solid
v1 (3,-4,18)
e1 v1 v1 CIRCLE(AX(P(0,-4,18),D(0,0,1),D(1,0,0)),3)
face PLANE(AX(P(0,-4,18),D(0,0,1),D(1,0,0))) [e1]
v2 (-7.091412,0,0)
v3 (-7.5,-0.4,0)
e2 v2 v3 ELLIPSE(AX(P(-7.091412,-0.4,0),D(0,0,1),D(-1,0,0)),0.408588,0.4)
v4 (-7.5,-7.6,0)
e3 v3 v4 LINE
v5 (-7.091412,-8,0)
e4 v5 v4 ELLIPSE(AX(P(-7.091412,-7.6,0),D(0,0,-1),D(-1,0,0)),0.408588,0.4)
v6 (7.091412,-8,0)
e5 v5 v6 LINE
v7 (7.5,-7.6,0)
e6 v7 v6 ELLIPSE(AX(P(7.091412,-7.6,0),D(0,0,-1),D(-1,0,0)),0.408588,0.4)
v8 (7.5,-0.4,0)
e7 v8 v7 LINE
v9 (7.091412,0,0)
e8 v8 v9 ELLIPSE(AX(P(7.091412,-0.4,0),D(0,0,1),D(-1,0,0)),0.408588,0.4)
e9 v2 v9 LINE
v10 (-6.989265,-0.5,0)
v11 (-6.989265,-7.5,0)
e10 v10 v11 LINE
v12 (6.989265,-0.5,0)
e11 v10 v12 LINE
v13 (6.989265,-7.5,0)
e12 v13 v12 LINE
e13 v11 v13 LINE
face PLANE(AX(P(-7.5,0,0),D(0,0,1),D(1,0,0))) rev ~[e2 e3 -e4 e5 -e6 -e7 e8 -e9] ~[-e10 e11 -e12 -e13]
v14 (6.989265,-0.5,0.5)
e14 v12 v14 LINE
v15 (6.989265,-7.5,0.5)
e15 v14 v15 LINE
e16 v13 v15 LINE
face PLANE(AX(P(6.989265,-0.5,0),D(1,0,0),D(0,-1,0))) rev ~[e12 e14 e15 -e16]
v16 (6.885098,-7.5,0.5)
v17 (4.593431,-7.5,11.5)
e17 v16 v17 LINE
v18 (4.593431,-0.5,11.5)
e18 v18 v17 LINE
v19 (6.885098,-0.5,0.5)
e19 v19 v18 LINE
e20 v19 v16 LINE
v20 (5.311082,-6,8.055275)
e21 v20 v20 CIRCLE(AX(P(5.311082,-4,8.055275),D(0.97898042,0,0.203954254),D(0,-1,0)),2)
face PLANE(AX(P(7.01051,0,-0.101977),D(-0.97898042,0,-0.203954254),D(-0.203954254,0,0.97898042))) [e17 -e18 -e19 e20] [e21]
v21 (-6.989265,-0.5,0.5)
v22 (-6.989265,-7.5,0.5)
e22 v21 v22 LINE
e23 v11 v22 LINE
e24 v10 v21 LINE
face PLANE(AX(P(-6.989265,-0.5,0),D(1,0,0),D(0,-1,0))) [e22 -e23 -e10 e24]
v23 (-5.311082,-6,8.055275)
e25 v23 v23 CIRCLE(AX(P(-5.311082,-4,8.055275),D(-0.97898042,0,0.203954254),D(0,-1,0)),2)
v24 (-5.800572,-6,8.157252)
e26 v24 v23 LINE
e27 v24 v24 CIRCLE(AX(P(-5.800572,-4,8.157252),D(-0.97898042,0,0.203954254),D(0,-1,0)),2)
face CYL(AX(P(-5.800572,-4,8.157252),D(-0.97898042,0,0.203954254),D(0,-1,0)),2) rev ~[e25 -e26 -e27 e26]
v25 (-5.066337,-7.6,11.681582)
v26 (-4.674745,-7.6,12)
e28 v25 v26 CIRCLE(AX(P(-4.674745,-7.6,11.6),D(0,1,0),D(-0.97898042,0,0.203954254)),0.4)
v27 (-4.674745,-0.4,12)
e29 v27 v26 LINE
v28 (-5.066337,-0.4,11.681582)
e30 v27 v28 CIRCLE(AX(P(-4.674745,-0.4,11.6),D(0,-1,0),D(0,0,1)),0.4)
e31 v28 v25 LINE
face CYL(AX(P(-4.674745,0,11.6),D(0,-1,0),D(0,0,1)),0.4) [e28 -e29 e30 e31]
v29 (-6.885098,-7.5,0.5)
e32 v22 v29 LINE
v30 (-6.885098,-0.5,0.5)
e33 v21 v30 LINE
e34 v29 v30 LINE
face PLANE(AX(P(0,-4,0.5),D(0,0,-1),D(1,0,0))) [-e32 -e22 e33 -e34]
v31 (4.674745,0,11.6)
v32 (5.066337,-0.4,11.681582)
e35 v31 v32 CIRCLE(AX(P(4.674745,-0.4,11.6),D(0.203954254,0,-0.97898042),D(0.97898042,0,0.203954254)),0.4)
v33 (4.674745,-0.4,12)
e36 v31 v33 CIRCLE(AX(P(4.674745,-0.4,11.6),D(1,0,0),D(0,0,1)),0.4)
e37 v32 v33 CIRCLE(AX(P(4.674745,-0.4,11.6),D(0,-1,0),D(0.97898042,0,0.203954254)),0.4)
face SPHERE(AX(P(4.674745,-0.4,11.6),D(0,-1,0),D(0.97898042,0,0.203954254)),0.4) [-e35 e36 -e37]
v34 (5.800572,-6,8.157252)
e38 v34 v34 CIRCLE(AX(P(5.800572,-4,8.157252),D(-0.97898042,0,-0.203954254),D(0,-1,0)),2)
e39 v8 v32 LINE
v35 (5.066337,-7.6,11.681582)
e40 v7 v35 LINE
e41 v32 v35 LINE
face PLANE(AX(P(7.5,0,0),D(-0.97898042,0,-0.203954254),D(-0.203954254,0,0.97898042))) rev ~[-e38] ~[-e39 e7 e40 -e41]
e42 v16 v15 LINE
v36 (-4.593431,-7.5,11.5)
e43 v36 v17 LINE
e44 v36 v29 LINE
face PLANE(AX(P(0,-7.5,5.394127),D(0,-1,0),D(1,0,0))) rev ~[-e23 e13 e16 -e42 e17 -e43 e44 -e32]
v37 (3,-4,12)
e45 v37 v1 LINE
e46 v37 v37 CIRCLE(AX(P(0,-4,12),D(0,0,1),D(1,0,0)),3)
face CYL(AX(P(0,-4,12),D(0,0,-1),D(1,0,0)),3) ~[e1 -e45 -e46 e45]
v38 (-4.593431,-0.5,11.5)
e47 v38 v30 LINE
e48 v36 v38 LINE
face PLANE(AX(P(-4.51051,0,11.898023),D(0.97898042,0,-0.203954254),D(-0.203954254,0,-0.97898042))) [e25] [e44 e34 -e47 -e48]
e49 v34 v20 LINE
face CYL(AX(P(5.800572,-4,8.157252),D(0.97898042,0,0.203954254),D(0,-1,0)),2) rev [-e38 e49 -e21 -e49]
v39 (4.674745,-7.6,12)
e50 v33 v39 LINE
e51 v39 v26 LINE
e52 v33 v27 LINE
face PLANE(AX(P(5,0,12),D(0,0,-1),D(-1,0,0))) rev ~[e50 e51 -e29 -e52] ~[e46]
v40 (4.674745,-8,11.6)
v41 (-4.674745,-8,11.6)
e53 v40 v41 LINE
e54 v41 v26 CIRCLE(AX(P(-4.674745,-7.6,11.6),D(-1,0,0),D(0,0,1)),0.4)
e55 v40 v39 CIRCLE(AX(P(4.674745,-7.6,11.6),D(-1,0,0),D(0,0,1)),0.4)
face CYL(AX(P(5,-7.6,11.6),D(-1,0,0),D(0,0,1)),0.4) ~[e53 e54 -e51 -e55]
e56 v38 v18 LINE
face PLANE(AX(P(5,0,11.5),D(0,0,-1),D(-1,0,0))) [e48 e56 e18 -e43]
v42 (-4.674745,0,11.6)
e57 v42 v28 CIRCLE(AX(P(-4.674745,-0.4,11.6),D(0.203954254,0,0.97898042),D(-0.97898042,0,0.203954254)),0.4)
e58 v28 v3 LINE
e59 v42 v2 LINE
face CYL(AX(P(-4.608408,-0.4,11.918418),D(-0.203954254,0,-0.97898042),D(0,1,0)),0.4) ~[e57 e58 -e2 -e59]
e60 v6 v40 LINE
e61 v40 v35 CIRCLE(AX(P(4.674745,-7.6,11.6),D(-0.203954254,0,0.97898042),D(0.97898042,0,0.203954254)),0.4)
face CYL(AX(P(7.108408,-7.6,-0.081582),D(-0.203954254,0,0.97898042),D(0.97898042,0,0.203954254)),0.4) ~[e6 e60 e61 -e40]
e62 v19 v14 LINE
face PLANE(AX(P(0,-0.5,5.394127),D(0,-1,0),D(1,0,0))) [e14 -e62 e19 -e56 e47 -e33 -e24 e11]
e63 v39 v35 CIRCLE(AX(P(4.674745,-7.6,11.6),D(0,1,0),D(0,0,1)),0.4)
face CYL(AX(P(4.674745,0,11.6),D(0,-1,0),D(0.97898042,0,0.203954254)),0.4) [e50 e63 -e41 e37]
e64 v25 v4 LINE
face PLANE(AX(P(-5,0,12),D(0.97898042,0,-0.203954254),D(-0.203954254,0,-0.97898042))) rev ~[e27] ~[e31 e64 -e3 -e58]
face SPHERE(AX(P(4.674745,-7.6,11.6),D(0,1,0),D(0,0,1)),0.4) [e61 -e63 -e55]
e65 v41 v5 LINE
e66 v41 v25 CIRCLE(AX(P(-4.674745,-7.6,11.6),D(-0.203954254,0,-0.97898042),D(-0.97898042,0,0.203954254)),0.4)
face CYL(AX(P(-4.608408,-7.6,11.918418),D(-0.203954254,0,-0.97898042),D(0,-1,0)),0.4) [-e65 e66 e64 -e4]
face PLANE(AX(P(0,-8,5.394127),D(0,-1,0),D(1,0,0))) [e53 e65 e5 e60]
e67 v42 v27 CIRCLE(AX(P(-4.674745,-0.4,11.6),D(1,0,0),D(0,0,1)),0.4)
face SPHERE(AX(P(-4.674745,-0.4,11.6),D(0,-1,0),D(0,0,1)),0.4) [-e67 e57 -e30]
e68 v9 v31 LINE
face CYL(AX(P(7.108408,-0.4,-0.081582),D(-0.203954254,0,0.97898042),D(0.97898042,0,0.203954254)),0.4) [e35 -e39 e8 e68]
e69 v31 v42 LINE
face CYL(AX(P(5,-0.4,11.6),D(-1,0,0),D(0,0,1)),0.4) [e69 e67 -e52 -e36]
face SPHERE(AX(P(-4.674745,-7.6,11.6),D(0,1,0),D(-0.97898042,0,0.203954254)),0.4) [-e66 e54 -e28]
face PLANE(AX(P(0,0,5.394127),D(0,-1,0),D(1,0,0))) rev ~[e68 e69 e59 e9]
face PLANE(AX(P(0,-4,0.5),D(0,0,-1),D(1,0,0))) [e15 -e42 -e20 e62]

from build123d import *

# Parameters (mm, degrees)
F1_DEPTH = 8
F2_T     = -0.5
F3_W     = 13.9785291107
F3_H     = 7
F4_DEPTH = 0.5
F5_R     = 0.4
F6_R     = 2
F7_DEPTH = 1
F8_R     = 3
F9_DEPTH = 6


# Not quite as in the source:
# - a pattern or mirror of a feature is missing from the dataset's text; its kind, count and spacing are read off the source's solid


with BuildPart() as f1:
    # F0 (on Front) → F1 (new body)
    with BuildSketch(Plane.XZ):
        Polygon((-7.5, 0), (0, 0), (7.5, 0), (5, 12), (0, 12), (-5, 12), align=None)
    extrude(amount=F1_DEPTH)

    # F2
    f2_openings = [f1.faces().sort_by_distance(p)[0] for p in [
        (0, -4, 0),
    ]]
    offset(amount=F2_T, openings=f2_openings)

    # F3 (on face) → F4 (cut)
    with BuildSketch(Plane(origin=(0, 0, 0), x_dir=(1, 0, 0), z_dir=(0, 0, -1))):
        with Locations((0, 4)):
            Rectangle(F3_W, F3_H)
    extrude(amount=-F4_DEPTH, mode=Mode.SUBTRACT)

    # F5
    f5_edges = [f1.edges().sort_by_distance(p)[0] for p in [
        (6.25, -8, 6),
        (5, -4, 12),
        (0, -8, 12),
        (6.25, 0, 6),
        (0, 0, 12),
        (-6.25, 0, 6),
        (-5, -4, 12),
        (-6.25, -8, 6),
    ]]
    fillet(f5_edges, radius=F5_R)

    # F6 (on face) → F7 (cut)
    with BuildSketch(Plane(origin=(-7.1880199667, 0, 1.4975041597), x_dir=(0, -1, 0), z_dir=(-0.9789804197, 0, 0.2039542541))):
        with Locations((4, 6.8027387439)):
            Circle(F6_R)
    f7 = extrude(amount=-F7_DEPTH, mode=Mode.SUBTRACT)

    # F7_copies: F7 across plane
    add(f7.mirror(Plane(origin=(0, 0, 0), x_dir=(0, 0, 1), z_dir=(1, 0, 0))), mode=Mode.SUBTRACT)

    # F8 (on face) → F9 (join)
    with BuildSketch(Plane.XY.offset(12)):
        with Locations((0, -4)):
            Circle(F8_R)
    extrude(amount=F9_DEPTH)


solid = f1.part
